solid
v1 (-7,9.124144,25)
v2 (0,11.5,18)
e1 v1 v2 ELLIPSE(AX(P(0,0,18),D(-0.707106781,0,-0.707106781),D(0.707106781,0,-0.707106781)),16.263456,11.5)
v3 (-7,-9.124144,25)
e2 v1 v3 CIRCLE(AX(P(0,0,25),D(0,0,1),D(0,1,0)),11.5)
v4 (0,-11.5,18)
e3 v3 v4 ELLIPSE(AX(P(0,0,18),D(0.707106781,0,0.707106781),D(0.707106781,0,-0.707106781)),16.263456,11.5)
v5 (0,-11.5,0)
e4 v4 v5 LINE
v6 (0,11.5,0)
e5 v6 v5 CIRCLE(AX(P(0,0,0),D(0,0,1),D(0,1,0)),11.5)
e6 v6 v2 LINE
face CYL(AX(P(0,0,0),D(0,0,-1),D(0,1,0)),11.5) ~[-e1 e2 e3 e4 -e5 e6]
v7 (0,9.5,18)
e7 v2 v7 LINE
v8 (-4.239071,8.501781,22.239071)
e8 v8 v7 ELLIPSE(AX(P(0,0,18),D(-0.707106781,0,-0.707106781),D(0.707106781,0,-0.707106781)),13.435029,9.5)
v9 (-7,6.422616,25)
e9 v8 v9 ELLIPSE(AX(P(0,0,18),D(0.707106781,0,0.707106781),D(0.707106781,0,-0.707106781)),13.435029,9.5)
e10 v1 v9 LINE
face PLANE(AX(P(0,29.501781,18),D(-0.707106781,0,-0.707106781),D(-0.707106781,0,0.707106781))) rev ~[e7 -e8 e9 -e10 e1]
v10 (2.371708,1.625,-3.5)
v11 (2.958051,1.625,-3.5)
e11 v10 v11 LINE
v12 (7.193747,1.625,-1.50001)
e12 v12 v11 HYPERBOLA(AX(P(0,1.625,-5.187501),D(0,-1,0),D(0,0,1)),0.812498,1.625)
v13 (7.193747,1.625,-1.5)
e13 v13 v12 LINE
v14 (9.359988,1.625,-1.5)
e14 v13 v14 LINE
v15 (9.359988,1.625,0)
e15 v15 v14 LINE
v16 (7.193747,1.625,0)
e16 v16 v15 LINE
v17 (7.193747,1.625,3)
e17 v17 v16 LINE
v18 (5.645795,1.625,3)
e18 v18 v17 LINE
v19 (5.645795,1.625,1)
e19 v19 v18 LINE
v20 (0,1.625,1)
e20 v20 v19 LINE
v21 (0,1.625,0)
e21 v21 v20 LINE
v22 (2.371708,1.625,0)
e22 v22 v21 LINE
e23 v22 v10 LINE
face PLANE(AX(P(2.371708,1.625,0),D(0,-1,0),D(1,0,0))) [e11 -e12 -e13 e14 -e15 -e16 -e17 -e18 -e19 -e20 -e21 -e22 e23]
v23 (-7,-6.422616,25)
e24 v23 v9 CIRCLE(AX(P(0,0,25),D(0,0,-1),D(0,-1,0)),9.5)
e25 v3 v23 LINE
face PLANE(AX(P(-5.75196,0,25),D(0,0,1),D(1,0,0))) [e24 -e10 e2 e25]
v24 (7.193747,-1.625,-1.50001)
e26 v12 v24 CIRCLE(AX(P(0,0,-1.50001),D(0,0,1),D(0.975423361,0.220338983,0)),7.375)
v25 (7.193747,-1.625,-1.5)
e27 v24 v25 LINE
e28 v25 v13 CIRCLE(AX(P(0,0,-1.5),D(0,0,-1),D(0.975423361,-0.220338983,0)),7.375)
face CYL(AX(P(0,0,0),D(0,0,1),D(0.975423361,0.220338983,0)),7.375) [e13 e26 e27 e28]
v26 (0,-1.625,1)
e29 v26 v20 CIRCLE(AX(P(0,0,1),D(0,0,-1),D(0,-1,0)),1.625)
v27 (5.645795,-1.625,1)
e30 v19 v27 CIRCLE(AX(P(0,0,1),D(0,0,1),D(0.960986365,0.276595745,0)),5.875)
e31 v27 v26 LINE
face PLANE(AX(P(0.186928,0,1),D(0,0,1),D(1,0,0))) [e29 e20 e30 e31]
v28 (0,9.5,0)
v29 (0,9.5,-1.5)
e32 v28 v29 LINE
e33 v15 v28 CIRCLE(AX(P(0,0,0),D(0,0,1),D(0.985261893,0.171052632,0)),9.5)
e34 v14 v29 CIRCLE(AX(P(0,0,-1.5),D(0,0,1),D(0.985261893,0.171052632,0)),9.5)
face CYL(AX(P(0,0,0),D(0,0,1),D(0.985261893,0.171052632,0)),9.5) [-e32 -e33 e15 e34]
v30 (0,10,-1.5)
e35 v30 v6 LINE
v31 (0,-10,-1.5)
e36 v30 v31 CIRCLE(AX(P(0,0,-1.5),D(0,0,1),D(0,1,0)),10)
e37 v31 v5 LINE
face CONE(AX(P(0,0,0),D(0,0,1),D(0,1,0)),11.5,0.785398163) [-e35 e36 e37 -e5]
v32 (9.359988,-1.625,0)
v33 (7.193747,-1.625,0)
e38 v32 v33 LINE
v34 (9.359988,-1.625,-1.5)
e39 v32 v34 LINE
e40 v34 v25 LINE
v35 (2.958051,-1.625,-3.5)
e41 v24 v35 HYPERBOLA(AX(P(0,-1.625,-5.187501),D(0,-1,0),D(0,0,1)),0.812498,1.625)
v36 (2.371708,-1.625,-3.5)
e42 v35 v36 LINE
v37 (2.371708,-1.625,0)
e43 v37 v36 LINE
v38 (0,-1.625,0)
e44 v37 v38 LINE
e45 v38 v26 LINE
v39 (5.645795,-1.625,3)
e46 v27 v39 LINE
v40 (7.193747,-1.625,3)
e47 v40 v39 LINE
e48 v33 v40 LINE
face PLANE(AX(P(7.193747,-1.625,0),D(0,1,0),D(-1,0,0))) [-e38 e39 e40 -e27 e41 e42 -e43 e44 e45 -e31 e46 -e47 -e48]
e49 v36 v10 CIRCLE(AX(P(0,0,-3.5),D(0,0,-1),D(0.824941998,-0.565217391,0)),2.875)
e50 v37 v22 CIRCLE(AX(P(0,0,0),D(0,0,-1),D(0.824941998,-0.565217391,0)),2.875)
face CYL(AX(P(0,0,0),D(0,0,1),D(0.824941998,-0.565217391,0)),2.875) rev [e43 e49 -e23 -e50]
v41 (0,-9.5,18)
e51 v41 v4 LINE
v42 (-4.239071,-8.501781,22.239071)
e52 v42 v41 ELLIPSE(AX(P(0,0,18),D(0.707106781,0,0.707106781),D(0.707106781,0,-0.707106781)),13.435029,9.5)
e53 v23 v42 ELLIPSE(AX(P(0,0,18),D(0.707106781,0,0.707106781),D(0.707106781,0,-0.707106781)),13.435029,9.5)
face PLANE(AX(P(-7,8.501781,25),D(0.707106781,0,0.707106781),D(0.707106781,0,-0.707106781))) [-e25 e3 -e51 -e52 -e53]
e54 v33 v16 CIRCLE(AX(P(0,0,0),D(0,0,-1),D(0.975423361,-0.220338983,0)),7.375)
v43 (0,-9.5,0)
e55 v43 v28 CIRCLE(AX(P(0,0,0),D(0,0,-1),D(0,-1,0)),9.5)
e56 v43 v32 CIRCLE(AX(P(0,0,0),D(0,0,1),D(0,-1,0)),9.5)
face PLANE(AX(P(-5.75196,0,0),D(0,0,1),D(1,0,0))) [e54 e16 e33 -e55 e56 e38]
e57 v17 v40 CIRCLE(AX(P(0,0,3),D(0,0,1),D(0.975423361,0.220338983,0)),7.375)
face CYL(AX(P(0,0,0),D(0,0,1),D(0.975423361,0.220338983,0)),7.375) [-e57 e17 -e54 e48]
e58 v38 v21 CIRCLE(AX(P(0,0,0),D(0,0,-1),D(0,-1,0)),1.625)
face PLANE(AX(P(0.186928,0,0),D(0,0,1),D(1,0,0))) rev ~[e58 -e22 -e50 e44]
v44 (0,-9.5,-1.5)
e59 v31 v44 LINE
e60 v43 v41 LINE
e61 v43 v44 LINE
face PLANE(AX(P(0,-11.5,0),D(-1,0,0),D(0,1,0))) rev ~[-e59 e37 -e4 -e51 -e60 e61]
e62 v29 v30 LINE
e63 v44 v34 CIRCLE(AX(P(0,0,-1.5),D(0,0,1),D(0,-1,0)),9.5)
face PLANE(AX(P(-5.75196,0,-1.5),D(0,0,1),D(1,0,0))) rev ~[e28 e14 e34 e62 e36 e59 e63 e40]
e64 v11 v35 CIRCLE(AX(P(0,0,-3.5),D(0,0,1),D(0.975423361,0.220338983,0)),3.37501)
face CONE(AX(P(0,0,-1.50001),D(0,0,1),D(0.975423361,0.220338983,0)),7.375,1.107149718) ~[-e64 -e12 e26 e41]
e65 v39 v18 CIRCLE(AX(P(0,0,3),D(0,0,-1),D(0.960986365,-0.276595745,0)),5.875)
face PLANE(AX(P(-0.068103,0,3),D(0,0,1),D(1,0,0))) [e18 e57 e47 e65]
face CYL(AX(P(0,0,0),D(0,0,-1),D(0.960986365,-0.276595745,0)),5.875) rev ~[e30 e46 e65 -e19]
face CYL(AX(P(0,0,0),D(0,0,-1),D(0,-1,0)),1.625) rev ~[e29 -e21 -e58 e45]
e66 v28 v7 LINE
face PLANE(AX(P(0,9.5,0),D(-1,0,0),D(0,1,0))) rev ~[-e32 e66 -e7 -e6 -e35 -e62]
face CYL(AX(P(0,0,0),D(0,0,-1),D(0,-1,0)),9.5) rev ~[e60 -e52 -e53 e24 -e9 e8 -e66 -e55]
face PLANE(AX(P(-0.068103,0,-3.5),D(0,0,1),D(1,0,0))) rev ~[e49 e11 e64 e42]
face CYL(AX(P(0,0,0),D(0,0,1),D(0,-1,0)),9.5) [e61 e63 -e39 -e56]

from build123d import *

# Parameters (mm, degrees)
F1_DEPTH    = 3
F2_DEPTH    = 1
F3_DEPTH    = 3.5
F4_DEPTH    = 1.5
F5_DEPTH    = 1.5
F6_DEPTH    = 25
F7_T1_DEPTH = 38.0035618315
F7_T3_DEPTH = 38.0035618315
F8_SIZE2    = 3.99999
F8_SIZE     = 1.99999
F9_SIZE     = 1.5


# Not quite as in the source:
# - a fillet or chamfer that OpenCascade refuses, or shapes differently, is made with other operations: its cross-section is extruded or revolved along the edge and cut away or added
# - a fillet or chamfer is up to 0.001 mm smaller than in the source, because OpenCascade refuses the exact size


with BuildPart() as f1:
    # F0 (on Top) → F1 (new body)
    with BuildSketch(Plane.XY):
        with BuildLine():
            Line((5.6457948953, 1.625), (7.193747285, 1.625))
            ThreePointArc((7.193747285, 1.625), (-7.375, 0), (7.193747285, -1.625))
            Line((7.193747285, -1.625), (5.6457948953, -1.625))
            ThreePointArc((5.6457948953, -1.625), (-5.875, 0), (5.6457948953, 1.625))
        make_face()
    extrude(amount=F1_DEPTH)

    # F0 (on Top) → F2 (join)
    with BuildSketch(Plane.XY):
        with BuildLine():
            Line((2.3717082451, 1.625), (5.6457948953, 1.625))
            ThreePointArc((5.6457948953, 1.625), (-5.875, 0), (5.6457948953, -1.625))
            Line((5.6457948953, -1.625), (2.3717082451, -1.625))
            ThreePointArc((2.3717082451, -1.625), (-2.875, 0), (2.3717082451, 1.625))
        make_face()
        with BuildLine():
            Line((0, 1.625), (2.3717082451, 1.625))
            ThreePointArc((2.3717082451, 1.625), (-2.875, 0), (2.3717082451, -1.625))
            Line((2.3717082451, -1.625), (0, -1.625))
            ThreePointArc((0, -1.625), (-1.625, 0), (0, 1.625))
        make_face()
    extrude(amount=F2_DEPTH)

    # F0 (on Top) → F3 (join)
    with BuildSketch(Plane.XY):
        with BuildLine():
            Line((5.6457948953, 1.625), (7.193747285, 1.625))
            ThreePointArc((7.193747285, 1.625), (-7.375, 0), (7.193747285, -1.625))
            Line((7.193747285, -1.625), (5.6457948953, -1.625))
            ThreePointArc((5.6457948953, -1.625), (-5.875, 0), (5.6457948953, 1.625))
        make_face()
        with BuildLine():
            Line((2.3717082451, 1.625), (5.6457948953, 1.625))
            ThreePointArc((5.6457948953, 1.625), (-5.875, 0), (5.6457948953, -1.625))
            Line((5.6457948953, -1.625), (2.3717082451, -1.625))
            ThreePointArc((2.3717082451, -1.625), (-2.875, 0), (2.3717082451, 1.625))
        make_face()
    extrude(amount=-F3_DEPTH)

    # F0 (on Top) → F4 (join)
    with BuildSketch(Plane.XY):
        with BuildLine():
            Line((7.193747285, 1.625), (9.3599879808, 1.625))
            ThreePointArc((9.3599879808, 1.625), (6.1160649114, 7.2693706743), (0, 9.5))
            ThreePointArc((0, 9.5), (-9.5, 0), (0, -9.5))
            ThreePointArc((0, -9.5), (6.1160649114, -7.2693706743), (9.3599879808, -1.625))
            Line((9.3599879808, -1.625), (7.193747285, -1.625))
            ThreePointArc((7.193747285, -1.625), (-7.375, 0), (7.193747285, 1.625))
        make_face()
    extrude(amount=-F4_DEPTH)

    # F0 (on Top) → F5 (join)
    with BuildSketch(Plane.XY):
        with BuildLine():
            ThreePointArc((0, -9.5), (-9.5, 0), (0, 9.5))
            Line((0, 9.5), (0, 11.5))
            ThreePointArc((0, 11.5), (-11.5, 0), (0, -11.5))
            Line((0, -11.5), (0, -9.5))
        make_face()
    extrude(amount=-F5_DEPTH)

    # F0 (on Top) → F6 (join)
    with BuildSketch(Plane.XY):
        with BuildLine():
            ThreePointArc((0, -9.5), (-9.5, 0), (0, 9.5))
            Line((0, 9.5), (0, 11.5))
            ThreePointArc((0, 11.5), (-11.5, 0), (0, -11.5))
            Line((0, -11.5), (0, -9.5))
        make_face()
    extrude(amount=F6_DEPTH)

    # F7: chamfer of 7 on 2 edges, made by hand

    # F7_s2 → F7_t1 (cut)
    with BuildSketch(Plane.XZ.offset(-8.5017809158)):
        Polygon((-7, 25), (0, 18), (0, 25), align=None)
    extrude(amount=F7_T1_DEPTH, mode=Mode.SUBTRACT)

    # F7_s4 → F7_t3 (cut)
    with BuildSketch(Plane.XZ.offset(-29.5017809158)):
        Polygon((0, 18), (-7, 25), (0, 25), align=None)
    extrude(amount=F7_T3_DEPTH, mode=Mode.SUBTRACT)

    # F8 (size 2 and 4 in the source; OpenCascade refuses exactly that, so slightly less here)
    f8_edges = [f1.edges().sort_by_distance(p)[0] for p in [
        (-7.375, 0, -3.5),
    ]]
    f8_side = f1.faces().sort_by_distance((-7.375, 0, -2.5))[0]
    chamfer(f8_edges, length=F8_SIZE, length2=F8_SIZE2, reference=f8_side)

    # F9
    f9_edges = [f1.edges().sort_by_distance(p)[0] for p in [
        (-11.5, 0, -1.5),
    ]]
    chamfer(f9_edges, length=F9_SIZE)


solid = f1.part
